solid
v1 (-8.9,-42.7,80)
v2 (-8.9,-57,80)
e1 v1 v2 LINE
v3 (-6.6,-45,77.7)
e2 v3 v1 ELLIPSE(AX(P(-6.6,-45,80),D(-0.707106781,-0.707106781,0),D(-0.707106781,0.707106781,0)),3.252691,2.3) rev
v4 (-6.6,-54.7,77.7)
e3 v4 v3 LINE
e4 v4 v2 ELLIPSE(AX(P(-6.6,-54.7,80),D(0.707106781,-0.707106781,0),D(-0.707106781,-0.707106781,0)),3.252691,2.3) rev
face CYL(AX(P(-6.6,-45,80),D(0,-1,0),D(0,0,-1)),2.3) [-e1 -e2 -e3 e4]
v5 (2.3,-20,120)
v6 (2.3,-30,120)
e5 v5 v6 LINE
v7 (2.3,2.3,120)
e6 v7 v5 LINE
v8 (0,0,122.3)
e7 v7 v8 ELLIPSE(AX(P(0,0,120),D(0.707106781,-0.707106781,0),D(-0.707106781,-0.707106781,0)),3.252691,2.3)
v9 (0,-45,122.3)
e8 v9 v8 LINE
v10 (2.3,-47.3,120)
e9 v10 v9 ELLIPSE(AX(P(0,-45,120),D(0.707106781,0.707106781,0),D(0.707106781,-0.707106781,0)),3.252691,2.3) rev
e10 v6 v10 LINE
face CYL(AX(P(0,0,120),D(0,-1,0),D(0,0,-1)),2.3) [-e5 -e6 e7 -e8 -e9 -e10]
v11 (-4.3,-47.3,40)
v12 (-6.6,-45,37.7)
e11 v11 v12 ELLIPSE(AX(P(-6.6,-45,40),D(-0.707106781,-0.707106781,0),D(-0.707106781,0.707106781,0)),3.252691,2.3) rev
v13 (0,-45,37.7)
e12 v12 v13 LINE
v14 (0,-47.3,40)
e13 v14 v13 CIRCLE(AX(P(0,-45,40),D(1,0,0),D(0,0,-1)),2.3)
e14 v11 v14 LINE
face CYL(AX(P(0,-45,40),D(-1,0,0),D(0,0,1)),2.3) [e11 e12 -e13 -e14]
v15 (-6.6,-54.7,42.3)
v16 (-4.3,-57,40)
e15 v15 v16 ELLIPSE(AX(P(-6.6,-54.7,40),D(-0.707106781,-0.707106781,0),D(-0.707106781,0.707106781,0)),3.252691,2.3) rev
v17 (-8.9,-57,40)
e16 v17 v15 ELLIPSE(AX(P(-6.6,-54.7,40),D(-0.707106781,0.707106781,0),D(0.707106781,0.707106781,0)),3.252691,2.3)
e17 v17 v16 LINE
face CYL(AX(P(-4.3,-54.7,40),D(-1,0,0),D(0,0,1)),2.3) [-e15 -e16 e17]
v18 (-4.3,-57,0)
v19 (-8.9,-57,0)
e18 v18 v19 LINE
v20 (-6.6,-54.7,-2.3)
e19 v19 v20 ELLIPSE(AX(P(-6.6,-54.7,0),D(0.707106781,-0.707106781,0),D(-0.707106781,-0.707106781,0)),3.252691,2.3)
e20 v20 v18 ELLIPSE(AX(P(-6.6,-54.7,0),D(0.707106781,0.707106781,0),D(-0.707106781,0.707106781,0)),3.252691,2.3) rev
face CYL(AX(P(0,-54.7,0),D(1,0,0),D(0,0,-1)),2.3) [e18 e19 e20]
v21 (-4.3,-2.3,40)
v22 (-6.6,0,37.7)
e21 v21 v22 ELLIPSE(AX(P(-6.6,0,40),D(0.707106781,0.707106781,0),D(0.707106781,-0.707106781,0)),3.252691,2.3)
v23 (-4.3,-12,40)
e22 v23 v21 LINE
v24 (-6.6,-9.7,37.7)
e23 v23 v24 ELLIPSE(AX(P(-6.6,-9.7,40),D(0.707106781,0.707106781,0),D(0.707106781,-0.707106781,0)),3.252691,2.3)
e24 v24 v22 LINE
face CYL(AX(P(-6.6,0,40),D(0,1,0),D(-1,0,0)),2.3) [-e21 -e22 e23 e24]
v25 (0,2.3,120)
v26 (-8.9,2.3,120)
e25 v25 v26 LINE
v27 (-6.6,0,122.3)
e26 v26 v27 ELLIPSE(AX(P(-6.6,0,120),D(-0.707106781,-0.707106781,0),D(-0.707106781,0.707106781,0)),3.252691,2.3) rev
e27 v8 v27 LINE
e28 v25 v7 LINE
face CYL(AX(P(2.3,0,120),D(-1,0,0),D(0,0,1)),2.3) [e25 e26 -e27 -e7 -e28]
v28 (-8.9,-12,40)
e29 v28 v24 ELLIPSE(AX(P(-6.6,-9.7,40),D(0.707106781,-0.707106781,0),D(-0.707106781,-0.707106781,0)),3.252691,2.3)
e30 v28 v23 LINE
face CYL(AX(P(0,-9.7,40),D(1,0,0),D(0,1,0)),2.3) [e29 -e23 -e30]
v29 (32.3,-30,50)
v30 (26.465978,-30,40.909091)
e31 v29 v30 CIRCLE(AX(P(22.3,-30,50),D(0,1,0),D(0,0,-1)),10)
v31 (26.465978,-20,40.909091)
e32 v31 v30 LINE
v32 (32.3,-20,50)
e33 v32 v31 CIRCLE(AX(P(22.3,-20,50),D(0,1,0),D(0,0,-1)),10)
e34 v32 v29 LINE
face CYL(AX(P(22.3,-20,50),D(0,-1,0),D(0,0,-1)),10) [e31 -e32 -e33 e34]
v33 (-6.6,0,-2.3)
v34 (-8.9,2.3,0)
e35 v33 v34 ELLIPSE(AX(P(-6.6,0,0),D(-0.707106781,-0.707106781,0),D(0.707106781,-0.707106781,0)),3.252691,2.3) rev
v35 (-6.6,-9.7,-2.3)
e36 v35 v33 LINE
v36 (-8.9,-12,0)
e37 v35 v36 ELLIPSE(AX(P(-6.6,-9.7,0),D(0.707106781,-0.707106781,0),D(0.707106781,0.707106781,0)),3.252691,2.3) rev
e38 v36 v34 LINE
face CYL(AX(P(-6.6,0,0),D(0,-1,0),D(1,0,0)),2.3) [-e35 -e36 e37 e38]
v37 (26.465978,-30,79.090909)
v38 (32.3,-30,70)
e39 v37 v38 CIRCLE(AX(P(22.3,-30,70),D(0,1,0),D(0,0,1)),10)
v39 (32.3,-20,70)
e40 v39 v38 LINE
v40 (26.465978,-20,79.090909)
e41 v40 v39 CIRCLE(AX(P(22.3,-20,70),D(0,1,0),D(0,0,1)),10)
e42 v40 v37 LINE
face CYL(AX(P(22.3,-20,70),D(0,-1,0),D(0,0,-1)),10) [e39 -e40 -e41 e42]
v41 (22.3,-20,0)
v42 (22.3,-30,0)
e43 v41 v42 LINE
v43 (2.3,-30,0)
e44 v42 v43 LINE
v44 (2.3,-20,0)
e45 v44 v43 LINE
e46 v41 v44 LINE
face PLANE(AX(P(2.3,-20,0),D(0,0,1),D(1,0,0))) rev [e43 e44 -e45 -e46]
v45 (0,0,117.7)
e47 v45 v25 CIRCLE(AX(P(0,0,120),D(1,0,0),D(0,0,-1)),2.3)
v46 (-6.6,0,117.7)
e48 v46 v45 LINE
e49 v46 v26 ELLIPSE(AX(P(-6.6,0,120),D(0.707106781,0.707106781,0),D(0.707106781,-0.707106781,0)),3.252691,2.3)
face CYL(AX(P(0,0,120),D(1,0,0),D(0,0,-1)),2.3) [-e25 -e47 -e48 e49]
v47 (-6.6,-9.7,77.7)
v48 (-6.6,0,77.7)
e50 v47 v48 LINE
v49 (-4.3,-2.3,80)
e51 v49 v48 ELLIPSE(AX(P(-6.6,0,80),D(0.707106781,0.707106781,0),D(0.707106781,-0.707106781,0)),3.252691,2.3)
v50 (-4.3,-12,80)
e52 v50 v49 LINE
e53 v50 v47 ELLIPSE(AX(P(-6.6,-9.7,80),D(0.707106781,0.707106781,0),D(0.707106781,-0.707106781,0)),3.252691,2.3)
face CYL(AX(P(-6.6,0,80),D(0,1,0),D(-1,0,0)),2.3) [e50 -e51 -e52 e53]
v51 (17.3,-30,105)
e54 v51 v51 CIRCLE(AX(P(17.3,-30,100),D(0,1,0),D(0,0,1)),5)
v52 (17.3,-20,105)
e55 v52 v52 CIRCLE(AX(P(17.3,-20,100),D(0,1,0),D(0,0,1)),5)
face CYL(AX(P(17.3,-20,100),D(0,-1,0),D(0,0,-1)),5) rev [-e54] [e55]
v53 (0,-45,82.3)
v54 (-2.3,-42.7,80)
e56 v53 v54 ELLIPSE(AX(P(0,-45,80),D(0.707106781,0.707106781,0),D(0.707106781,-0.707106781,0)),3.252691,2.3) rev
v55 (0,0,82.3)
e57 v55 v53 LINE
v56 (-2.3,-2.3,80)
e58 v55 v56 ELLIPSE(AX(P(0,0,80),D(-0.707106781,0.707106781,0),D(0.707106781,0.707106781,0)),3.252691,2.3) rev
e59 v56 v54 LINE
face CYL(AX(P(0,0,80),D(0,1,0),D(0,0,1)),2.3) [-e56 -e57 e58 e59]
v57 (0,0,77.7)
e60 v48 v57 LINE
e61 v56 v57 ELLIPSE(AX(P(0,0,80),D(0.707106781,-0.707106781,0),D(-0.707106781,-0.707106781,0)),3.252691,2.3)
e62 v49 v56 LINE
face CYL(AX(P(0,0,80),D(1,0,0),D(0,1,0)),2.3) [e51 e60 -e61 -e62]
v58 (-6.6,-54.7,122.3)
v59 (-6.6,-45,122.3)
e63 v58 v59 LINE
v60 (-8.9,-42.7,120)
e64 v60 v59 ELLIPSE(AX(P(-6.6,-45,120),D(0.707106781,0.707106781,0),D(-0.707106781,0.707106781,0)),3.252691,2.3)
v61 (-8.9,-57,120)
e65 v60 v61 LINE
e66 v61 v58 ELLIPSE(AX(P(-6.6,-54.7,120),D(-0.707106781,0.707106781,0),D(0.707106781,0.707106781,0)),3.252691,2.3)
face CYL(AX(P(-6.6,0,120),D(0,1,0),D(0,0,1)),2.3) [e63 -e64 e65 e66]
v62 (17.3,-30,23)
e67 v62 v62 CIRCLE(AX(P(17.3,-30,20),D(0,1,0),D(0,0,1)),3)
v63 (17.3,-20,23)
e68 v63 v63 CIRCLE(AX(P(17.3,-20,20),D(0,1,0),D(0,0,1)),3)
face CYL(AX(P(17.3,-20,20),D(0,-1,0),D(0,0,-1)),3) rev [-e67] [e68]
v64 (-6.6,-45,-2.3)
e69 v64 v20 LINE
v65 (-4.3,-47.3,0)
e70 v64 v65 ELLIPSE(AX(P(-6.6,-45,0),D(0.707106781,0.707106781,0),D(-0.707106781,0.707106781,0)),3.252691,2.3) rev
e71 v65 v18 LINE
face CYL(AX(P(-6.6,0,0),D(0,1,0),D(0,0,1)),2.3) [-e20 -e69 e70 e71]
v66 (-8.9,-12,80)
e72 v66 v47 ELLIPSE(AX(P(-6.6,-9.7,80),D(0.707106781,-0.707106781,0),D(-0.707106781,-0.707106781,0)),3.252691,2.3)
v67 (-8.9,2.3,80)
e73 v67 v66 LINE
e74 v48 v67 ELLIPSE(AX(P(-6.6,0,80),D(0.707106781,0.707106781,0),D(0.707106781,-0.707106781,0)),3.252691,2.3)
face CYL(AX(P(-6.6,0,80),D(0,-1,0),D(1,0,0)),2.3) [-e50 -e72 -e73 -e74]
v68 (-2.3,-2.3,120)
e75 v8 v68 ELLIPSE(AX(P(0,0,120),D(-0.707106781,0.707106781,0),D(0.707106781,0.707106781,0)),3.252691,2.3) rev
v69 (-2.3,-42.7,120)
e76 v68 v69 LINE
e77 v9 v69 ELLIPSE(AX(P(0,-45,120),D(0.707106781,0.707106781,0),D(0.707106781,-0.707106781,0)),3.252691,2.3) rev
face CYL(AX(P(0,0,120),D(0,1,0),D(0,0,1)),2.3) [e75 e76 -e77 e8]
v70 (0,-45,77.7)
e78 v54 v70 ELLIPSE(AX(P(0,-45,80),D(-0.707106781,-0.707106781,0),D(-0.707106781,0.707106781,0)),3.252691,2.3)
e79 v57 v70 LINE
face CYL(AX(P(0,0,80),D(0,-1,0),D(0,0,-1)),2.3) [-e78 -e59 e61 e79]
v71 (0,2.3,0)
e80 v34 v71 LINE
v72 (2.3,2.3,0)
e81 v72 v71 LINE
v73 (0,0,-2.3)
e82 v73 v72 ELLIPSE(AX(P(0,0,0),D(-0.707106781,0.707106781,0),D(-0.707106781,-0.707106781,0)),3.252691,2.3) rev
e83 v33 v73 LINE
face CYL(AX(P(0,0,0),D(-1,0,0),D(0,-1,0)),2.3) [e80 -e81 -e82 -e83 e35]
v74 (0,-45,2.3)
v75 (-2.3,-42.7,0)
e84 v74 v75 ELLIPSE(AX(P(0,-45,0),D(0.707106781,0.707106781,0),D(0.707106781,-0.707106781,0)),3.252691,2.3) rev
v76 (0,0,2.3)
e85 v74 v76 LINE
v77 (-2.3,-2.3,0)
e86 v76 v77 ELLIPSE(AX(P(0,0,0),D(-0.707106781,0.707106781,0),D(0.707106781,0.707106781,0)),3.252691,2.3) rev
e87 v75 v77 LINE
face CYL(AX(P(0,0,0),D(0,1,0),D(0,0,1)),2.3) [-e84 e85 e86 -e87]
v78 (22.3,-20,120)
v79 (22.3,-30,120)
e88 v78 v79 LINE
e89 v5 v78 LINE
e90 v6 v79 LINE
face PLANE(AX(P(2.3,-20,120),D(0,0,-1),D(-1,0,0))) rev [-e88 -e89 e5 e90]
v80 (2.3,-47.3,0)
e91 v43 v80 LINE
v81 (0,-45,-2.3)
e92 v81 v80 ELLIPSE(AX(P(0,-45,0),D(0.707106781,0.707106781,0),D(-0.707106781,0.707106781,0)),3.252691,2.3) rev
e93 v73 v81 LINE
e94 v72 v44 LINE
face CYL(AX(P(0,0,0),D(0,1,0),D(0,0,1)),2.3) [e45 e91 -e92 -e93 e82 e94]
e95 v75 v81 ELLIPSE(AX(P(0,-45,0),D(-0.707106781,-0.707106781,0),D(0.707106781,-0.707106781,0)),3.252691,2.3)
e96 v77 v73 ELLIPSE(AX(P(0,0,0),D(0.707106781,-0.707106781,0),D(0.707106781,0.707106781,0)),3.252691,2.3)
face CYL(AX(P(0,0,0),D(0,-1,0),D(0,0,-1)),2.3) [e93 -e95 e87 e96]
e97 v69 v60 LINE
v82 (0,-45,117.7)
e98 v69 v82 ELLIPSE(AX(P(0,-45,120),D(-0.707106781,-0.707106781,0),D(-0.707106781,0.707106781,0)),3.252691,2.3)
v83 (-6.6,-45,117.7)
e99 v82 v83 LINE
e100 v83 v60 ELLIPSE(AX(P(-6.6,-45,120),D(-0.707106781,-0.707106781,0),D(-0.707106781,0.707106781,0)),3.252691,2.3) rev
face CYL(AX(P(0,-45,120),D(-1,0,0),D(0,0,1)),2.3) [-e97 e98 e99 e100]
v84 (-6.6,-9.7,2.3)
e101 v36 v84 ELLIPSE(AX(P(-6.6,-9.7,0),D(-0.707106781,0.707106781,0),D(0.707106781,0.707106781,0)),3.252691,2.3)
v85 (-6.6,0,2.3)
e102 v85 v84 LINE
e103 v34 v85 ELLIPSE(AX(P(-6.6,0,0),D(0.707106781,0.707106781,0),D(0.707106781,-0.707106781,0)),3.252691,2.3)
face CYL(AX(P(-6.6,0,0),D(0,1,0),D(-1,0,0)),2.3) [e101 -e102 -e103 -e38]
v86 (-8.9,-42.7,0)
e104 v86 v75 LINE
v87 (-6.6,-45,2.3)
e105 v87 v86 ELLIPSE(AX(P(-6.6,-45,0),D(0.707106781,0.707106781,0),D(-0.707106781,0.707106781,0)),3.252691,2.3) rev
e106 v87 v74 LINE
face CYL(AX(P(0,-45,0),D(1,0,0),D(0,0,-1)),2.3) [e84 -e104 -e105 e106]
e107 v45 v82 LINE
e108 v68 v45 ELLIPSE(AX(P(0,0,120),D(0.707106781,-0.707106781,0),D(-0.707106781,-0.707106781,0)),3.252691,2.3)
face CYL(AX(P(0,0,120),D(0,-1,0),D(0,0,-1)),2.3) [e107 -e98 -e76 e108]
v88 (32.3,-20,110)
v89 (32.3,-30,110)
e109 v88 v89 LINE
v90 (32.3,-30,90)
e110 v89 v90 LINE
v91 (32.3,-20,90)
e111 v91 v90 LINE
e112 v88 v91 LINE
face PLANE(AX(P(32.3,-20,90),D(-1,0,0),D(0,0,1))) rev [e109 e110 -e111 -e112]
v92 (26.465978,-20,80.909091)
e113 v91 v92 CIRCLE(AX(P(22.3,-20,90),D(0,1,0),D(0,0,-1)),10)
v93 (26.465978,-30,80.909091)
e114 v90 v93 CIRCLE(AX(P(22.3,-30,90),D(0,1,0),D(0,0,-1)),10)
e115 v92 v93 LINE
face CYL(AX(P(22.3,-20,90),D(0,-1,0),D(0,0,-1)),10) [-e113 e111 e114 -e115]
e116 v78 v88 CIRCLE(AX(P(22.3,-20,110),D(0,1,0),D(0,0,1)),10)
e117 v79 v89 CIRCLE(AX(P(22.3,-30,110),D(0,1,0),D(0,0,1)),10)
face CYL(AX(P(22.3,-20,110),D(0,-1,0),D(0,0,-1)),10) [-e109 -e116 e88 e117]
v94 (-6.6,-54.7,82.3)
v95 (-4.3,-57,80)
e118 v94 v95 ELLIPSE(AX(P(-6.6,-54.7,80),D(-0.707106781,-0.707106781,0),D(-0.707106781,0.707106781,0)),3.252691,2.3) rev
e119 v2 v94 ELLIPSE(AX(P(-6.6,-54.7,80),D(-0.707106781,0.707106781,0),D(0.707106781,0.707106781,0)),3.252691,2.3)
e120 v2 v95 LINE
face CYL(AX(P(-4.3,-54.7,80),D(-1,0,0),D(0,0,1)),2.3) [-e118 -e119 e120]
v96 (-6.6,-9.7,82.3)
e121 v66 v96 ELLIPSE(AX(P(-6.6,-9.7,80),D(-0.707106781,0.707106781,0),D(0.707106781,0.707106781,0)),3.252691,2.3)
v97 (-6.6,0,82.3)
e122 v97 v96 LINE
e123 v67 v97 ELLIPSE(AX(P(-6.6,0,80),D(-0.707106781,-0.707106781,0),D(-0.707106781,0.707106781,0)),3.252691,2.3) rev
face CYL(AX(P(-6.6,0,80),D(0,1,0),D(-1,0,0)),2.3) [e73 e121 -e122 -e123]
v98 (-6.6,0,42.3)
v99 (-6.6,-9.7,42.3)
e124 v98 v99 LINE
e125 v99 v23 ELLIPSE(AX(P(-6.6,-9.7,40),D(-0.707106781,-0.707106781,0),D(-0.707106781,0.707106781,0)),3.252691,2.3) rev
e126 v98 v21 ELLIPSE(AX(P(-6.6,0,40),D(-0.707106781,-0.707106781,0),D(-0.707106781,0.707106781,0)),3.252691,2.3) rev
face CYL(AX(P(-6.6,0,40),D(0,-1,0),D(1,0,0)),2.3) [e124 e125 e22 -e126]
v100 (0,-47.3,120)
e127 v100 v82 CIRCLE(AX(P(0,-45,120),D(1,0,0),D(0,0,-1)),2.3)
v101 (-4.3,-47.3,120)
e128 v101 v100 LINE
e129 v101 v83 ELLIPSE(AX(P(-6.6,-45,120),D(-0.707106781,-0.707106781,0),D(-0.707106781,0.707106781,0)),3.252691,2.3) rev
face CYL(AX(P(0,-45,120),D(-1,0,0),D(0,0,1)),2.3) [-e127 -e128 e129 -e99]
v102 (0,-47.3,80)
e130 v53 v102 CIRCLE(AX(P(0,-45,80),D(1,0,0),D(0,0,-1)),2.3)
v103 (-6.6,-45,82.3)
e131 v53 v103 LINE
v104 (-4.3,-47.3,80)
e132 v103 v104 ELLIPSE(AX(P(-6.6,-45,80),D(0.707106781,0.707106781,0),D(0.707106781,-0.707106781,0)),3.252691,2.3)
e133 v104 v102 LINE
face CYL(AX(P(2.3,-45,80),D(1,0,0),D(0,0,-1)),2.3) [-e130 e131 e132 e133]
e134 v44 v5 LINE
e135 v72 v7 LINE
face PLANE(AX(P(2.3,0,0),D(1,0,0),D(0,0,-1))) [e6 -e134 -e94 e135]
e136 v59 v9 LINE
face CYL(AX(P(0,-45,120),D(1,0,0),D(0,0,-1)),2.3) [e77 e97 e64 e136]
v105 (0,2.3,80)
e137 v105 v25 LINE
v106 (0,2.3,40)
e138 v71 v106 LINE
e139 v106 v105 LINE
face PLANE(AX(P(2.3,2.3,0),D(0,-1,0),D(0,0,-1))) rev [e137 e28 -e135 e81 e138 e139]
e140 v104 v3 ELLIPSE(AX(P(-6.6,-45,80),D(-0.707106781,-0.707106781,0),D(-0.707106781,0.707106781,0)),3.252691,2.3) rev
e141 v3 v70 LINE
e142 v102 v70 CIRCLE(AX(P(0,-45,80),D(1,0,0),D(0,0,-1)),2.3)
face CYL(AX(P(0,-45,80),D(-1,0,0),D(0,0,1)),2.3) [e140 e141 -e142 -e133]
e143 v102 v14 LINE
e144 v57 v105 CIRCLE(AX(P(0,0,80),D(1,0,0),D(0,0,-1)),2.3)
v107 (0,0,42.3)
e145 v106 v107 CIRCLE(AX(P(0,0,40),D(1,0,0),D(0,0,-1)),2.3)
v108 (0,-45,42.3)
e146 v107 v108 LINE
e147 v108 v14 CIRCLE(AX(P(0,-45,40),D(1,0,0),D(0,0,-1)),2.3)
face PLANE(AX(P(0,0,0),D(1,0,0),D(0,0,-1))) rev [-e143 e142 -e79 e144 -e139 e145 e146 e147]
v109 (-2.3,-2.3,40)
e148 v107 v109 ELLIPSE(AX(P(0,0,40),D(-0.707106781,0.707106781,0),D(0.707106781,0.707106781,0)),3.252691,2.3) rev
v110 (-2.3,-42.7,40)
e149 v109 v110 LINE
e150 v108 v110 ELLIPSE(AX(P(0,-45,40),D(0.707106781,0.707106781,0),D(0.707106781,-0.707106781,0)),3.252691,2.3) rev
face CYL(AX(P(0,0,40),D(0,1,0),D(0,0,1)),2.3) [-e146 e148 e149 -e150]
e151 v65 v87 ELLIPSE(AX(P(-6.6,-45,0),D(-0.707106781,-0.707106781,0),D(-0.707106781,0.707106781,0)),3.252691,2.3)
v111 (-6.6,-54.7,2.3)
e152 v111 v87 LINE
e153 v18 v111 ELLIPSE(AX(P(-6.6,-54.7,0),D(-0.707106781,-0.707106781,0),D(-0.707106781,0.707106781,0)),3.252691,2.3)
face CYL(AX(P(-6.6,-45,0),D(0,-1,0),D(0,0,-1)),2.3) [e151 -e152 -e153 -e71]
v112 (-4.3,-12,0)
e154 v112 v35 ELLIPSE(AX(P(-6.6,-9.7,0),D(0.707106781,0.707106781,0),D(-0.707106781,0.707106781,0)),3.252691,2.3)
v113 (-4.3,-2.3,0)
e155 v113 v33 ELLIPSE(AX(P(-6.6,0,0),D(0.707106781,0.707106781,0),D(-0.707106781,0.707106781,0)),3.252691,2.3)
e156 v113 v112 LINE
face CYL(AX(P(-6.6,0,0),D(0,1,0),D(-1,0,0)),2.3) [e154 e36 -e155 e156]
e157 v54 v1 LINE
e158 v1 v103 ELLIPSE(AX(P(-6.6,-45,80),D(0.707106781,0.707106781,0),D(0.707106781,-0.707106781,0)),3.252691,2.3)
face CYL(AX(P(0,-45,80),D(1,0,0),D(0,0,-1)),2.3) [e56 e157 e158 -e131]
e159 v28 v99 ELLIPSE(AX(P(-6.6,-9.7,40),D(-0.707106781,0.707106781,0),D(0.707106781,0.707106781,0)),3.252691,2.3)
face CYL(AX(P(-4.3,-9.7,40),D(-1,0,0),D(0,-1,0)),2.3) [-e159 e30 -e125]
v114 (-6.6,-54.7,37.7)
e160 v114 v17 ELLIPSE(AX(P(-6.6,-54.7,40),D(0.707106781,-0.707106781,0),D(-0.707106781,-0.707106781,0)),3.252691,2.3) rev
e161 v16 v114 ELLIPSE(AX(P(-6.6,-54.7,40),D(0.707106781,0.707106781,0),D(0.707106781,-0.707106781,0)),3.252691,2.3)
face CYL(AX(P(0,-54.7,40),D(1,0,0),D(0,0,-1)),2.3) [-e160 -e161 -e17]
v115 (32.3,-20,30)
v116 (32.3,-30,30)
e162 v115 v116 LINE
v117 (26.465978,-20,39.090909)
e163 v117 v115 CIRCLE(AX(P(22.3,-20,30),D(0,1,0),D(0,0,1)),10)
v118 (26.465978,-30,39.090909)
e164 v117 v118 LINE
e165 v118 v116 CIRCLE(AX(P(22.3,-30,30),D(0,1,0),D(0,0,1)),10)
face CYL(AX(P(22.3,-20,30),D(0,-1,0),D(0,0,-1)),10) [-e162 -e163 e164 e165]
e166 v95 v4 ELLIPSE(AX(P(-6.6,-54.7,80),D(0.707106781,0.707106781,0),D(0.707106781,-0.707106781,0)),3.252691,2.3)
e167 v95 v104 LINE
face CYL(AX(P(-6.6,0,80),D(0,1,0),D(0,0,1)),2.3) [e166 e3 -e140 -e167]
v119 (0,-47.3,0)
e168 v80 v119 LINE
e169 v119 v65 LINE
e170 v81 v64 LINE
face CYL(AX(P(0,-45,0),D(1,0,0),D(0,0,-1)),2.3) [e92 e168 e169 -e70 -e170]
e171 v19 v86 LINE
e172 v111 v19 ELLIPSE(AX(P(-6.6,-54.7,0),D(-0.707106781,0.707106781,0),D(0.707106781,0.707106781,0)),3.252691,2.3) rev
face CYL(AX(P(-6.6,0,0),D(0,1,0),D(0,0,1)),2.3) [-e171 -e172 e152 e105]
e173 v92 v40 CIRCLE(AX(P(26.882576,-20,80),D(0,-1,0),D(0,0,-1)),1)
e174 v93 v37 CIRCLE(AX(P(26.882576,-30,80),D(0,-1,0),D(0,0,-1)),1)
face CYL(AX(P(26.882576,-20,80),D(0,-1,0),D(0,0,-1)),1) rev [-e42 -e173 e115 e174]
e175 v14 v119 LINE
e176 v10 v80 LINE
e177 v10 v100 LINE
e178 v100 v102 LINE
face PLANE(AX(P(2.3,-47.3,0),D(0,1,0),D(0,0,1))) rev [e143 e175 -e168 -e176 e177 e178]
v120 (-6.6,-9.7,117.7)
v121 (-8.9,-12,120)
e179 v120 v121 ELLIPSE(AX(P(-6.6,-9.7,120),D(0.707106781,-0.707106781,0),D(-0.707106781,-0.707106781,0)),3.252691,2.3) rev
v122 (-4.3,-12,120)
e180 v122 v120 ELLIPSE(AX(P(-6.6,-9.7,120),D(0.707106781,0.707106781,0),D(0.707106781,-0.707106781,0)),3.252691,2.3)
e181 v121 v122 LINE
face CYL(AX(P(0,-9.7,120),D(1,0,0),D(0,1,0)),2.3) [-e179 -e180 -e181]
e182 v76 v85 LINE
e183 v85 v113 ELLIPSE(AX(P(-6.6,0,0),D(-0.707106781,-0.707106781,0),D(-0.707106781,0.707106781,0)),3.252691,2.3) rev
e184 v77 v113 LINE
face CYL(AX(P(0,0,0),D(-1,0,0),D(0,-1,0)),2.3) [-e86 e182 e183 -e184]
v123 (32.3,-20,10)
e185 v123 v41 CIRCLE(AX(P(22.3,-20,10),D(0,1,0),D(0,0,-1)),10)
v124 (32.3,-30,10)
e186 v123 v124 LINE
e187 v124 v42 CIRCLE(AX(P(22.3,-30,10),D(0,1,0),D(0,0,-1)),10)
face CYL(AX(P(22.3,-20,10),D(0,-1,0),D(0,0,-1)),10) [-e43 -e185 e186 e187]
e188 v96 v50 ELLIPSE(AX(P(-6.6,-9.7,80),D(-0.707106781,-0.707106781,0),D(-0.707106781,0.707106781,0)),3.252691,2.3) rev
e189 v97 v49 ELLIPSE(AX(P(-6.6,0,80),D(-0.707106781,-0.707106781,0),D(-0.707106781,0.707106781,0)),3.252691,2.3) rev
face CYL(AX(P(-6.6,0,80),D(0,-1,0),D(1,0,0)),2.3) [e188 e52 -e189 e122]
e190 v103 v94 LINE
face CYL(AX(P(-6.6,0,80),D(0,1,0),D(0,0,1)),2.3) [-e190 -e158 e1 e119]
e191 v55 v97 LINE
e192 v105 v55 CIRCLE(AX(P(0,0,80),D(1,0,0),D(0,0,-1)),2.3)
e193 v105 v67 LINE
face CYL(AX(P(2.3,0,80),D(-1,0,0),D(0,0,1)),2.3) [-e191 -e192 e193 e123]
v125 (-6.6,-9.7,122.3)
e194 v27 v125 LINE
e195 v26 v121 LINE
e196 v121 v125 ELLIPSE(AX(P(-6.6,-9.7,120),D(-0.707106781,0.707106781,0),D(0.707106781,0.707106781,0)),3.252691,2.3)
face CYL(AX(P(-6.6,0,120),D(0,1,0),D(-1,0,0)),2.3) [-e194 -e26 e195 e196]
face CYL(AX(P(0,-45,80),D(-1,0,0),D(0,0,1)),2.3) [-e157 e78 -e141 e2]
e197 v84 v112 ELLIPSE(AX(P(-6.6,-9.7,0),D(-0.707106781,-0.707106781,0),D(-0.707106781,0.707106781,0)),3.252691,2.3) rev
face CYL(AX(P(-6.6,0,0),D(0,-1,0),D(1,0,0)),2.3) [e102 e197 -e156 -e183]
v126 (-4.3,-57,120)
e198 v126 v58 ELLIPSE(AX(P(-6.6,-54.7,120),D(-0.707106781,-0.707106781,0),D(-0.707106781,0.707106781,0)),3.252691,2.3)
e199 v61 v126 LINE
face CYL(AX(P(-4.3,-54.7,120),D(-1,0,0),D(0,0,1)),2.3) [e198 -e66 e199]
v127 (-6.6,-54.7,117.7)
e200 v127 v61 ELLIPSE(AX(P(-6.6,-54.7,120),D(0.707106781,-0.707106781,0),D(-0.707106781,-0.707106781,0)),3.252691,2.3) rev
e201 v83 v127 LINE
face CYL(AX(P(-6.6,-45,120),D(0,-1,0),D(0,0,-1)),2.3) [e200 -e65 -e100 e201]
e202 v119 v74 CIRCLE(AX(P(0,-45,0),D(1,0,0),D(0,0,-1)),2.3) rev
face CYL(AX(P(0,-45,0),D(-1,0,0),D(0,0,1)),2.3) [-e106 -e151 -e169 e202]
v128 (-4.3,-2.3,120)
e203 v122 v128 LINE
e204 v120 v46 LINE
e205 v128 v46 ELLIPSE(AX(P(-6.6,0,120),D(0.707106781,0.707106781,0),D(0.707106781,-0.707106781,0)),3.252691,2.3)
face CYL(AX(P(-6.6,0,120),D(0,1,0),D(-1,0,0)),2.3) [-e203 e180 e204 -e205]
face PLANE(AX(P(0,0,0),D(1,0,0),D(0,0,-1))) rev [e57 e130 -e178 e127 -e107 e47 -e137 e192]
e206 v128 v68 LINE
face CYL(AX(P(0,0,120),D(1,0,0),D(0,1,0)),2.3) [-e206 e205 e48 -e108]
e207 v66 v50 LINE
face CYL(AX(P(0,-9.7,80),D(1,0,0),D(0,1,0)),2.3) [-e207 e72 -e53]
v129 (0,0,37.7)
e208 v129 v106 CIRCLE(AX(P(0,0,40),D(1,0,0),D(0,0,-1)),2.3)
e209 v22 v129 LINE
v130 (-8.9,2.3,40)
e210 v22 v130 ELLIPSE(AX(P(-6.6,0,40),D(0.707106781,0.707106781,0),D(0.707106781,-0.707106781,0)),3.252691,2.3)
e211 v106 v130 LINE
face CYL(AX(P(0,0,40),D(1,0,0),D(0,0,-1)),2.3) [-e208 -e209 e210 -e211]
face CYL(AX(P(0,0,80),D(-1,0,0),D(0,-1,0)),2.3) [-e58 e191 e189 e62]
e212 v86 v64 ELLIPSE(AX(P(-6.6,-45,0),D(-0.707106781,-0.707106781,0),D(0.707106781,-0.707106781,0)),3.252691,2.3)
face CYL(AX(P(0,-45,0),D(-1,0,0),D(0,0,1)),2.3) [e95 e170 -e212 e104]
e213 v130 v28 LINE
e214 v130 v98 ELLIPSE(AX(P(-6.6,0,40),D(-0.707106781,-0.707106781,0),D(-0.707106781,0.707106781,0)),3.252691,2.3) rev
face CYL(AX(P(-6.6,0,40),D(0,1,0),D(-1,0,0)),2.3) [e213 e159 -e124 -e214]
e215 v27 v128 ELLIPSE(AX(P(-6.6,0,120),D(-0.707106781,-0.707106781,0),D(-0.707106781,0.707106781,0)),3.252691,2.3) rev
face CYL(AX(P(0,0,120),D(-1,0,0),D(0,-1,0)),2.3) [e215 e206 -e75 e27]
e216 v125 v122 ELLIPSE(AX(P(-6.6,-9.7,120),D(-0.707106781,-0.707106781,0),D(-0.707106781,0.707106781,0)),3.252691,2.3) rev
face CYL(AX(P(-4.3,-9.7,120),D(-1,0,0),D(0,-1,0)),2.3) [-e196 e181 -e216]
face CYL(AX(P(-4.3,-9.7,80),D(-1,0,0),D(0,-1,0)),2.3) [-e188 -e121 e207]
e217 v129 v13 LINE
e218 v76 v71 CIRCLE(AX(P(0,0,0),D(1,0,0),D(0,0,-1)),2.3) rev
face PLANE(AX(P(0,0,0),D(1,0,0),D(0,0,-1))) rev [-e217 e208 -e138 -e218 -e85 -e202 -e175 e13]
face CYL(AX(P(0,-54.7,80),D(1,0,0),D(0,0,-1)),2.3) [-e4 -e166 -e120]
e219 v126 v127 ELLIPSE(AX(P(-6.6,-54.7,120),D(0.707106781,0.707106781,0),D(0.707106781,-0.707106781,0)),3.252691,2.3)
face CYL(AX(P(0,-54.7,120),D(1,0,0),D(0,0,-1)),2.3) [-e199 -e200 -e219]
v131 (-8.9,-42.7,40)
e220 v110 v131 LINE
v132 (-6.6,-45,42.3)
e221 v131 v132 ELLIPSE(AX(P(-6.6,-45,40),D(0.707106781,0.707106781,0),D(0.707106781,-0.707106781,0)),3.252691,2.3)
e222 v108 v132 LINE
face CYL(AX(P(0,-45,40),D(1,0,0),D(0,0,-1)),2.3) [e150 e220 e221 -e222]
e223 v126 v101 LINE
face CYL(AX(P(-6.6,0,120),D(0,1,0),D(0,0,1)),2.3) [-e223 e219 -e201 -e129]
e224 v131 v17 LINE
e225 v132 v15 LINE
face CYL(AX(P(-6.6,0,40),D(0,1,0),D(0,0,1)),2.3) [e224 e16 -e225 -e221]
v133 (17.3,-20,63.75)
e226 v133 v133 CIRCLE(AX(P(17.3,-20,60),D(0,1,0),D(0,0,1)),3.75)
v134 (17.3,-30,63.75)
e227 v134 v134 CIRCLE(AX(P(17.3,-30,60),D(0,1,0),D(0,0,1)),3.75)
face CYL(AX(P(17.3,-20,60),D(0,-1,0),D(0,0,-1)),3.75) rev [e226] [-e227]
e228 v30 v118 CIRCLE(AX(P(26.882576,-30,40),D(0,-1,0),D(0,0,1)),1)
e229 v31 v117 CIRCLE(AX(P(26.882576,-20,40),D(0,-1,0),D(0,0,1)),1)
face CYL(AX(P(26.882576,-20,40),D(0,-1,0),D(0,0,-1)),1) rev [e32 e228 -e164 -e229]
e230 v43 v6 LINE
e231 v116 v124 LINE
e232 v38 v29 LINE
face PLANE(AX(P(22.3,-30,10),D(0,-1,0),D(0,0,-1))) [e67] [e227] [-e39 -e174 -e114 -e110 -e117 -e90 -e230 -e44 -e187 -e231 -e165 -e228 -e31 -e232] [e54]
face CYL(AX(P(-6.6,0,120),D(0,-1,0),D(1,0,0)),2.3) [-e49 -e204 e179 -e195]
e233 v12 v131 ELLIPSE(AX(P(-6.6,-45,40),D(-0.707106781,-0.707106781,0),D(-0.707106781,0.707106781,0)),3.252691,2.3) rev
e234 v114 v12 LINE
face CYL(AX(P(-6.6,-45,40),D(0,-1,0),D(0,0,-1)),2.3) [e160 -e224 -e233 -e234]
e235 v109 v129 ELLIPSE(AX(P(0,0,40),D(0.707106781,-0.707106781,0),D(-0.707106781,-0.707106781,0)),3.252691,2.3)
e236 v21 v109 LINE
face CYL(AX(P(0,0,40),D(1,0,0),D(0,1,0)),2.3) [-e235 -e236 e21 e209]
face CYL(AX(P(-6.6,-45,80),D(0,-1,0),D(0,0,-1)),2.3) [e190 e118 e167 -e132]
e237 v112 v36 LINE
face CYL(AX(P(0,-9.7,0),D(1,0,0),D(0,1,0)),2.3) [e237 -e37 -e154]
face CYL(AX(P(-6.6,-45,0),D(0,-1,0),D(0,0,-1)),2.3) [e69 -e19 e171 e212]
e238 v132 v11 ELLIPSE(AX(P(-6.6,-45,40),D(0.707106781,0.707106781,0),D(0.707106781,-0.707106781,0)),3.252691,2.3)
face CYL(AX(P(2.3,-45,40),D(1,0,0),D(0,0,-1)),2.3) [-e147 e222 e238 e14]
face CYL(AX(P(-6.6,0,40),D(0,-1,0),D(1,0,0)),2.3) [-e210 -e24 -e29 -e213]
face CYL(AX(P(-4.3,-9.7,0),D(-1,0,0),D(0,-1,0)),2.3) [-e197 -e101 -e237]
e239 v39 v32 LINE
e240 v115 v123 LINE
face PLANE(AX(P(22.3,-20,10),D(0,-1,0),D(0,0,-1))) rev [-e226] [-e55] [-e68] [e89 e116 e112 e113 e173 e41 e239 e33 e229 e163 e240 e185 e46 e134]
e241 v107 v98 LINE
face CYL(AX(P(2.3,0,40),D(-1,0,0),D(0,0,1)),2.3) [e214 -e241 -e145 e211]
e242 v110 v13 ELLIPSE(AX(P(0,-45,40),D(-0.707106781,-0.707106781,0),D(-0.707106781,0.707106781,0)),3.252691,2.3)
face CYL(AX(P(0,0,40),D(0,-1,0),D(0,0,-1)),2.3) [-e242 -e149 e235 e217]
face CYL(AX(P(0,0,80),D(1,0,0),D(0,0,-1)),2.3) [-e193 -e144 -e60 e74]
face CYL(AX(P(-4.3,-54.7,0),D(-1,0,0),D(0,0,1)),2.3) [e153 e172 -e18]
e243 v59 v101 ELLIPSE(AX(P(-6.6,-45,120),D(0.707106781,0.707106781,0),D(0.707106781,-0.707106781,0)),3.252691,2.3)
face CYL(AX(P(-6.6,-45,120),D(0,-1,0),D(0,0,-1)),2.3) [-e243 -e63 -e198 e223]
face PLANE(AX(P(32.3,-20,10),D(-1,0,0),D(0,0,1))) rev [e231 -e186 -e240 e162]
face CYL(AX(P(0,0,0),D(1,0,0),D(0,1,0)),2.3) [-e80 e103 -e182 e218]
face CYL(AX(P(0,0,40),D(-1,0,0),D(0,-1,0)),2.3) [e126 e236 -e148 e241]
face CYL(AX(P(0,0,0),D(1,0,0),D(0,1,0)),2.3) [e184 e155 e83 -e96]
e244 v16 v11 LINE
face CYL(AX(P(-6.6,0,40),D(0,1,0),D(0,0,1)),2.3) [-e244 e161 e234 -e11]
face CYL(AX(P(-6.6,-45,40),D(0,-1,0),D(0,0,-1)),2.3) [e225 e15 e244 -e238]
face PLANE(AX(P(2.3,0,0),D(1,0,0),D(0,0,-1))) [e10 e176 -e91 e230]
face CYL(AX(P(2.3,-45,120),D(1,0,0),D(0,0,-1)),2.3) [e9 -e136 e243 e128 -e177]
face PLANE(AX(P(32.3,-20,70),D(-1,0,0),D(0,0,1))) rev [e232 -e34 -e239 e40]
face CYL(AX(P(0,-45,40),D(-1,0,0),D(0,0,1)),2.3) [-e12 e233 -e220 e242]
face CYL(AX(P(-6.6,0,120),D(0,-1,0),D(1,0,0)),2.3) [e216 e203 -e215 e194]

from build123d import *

# Parameters (mm, degrees)
EXTRU_MINCE1_DEPTH           = 2.3
CONG_1_R                     = 2.3
ESQUISSE2_W                  = 120
ESQUISSE2_H                  = 49.6
BOSS_EXTRU_1_DEPTH           = 2.3
R_P_TITION_START             = 117.7
R_P_TITION_LIN_AIRE1_DEPTH   = 4.6
R_P_TITION_START_2           = 37.7
R_P_TITION_LIN_AIRE1_2_DEPTH = 4.6
R_P_TITION_START_3           = 77.7
R_P_TITION_LIN_AIRE1_3_DEPTH = 4.6
CONG_2_R                     = 2.3
BOSS_EXTRU_2_START           = -30
BOSS_EXTRU_2_OUTLINE_R       = 5
BOSS_EXTRU_2_OUTLINE_R_2     = 3.75
BOSS_EXTRU_2_OUTLINE_R_3     = 3
BOSS_EXTRU_2_DEPTH           = 10


# Read off the part's stored shape, not the designer's step: Répétition linéaire1, Boss.-Extru.2
with BuildPart() as part:
    # Esquisse1 → Extru.-Mince1 (new, symmetric)
    with BuildSketch(Plane.XY):
        Polygon((-4.3, -57), (-4.3, -47.3), (2.3, -47.3), (2.3, 2.3), (-8.9, 2.3), (-8.9, -12), (-4.3, -12), (-4.3, -2.3), (-2.3, -2.3), (-2.3, -42.7), (-8.9, -42.7), (-8.9, -57), align=None)
    extrude(amount=EXTRU_MINCE1_DEPTH, both=True)

    # Congé1
    cong_1_edges = [part.edges().sort_by_distance(p)[0] for p in [
        (-6.6, -57, -2.3),
        (-4.3, -52.15, -2.3),
        (-1, -47.3, -2.3),
        (2.3, -22.5, -2.3),
        (-3.3, 2.3, -2.3),
        (-8.9, -4.85, -2.3),
        (-6.6, -12, -2.3),
        (-4.3, -7.15, -2.3),
        (-3.3, -2.3, -2.3),
        (-2.3, -22.5, -2.3),
        (-5.6, -42.7, -2.3),
        (-8.9, -49.85, -2.3),
        (-5.6, -42.7, 2.3),
        (-2.3, -22.5, 2.3),
        (-3.3, -2.3, 2.3),
        (-4.3, -7.15, 2.3),
        (-6.6, -12, 2.3),
        (-8.9, -4.85, 2.3),
        (-3.3, 2.3, 2.3),
        (2.3, -22.5, 2.3),
        (-1, -47.3, 2.3),
        (-4.3, -52.15, 2.3),
        (-6.6, -57, 2.3),
        (-8.9, -49.85, 2.3),
    ]]
    fillet(cong_1_edges, radius=CONG_1_R - 0.0001)  # a hair under: the kernel refuses the full size

    # Esquisse2 → Boss.-Extru.1 (add)
    with BuildSketch(Plane(origin=(0, 0, 0), x_dir=(0, 0, -1), z_dir=(1, 0, 0))):
        with Locations((-60, -22.5)):
            Rectangle(ESQUISSE2_W, ESQUISSE2_H)
    extrude(amount=BOSS_EXTRU_1_DEPTH)

    # Répétition linéaire1 outline → Répétition linéaire1 (add)
    with BuildSketch(Plane.XY.offset(R_P_TITION_START)):
        Polygon((-8.9, 2.3), (-8.9, -12), (-4.3, -12), (-4.3, -2.3), (-2.3, -2.3), (-2.3, -42.7), (-8.9, -42.7), (-8.9, -57), (-4.3, -57), (-4.3, -47.3), (2.3, -47.3), (2.3, 2.3), align=None)
    extrude(amount=R_P_TITION_LIN_AIRE1_DEPTH)

    # R_p_tition lin_aire1 2 outline → R_p_tition lin_aire1 2 (add)
    with BuildSketch(Plane.XY.offset(R_P_TITION_START_2)):
        Polygon((0, 2.3), (-8.9, 2.3), (-8.9, -12), (-4.3, -12), (-4.3, -2.3), (-2.3, -2.3), (-2.3, -42.7), (-8.9, -42.7), (-8.9, -57), (-4.3, -57), (-4.3, -47.3), (0, -47.3), align=None)
    extrude(amount=R_P_TITION_LIN_AIRE1_2_DEPTH)

    # R_p_tition lin_aire1 3 outline → R_p_tition lin_aire1 3 (add)
    with BuildSketch(Plane.XY.offset(R_P_TITION_START_3)):
        Polygon((0, 2.3), (-8.9, 2.3), (-8.9, -12), (-4.3, -12), (-4.3, -2.3), (-2.3, -2.3), (-2.3, -42.7), (-8.9, -42.7), (-8.9, -57), (-4.3, -57), (-4.3, -47.3), (0, -47.3), align=None)
    extrude(amount=R_P_TITION_LIN_AIRE1_3_DEPTH)

    # Congé2
    cong_2_edges = [part.edges().sort_by_distance(p)[0] for p in [
        (-2.15, -47.3, 82.3),
        (-4.45, 2.3, 82.3),
        (-4.3, -7.15, 82.3),
        (-3.3, -2.3, 82.3),
        (-2.3, -22.5, 82.3),
        (-5.6, -42.7, 82.3),
        (-8.9, -49.85, 82.3),
        (-4.45, 2.3, 77.7),
        (-2.15, -47.3, 77.7),
        (-4.3, -52.15, 77.7),
        (-6.6, -57, 77.7),
        (-6.6, -12, 77.7),
        (-8.9, -4.85, 77.7),
        (-8.9, -49.85, 77.7),
        (-6.6, -57, 82.3),
        (-4.3, -52.15, 82.3),
        (-8.9, -4.85, 82.3),
        (-6.6, -12, 82.3),
        (-4.3, -7.15, 77.7),
        (-3.3, -2.3, 77.7),
        (-2.3, -22.5, 77.7),
        (-5.6, -42.7, 77.7),
        (2.3, -22.5, 122.3),
        (-1, -47.3, 122.3),
        (-3.3, 2.3, 122.3),
        (-4.45, 2.3, 117.7),
        (-2.15, -47.3, 117.7),
        (-4.3, -52.15, 117.7),
        (-6.6, -57, 117.7),
        (-6.6, -12, 117.7),
        (-8.9, -4.85, 117.7),
        (-8.9, -49.85, 117.7),
        (-6.6, -57, 122.3),
        (-4.3, -52.15, 122.3),
        (-8.9, -4.85, 122.3),
        (-6.6, -12, 122.3),
        (-4.3, -7.15, 117.7),
        (-3.3, -2.3, 117.7),
        (-2.3, -22.5, 117.7),
        (-5.6, -42.7, 117.7),
        (-8.9, -49.85, 122.3),
        (-4.3, -7.15, 122.3),
        (-3.3, -2.3, 122.3),
        (-2.3, -22.5, 122.3),
        (-5.6, -42.7, 122.3),
        (-2.15, -47.3, 42.3),
        (-4.45, 2.3, 42.3),
        (-4.3, -7.15, 42.3),
        (-3.3, -2.3, 42.3),
        (-2.3, -22.5, 42.3),
        (-5.6, -42.7, 42.3),
        (-8.9, -49.85, 42.3),
        (-4.45, 2.3, 37.7),
        (-2.15, -47.3, 37.7),
        (-4.3, -52.15, 37.7),
        (-6.6, -57, 37.7),
        (-6.6, -12, 37.7),
        (-8.9, -4.85, 37.7),
        (-8.9, -49.85, 37.7),
        (-6.6, -57, 42.3),
        (-4.3, -52.15, 42.3),
        (-8.9, -4.85, 42.3),
        (-6.6, -12, 42.3),
        (-4.3, -7.15, 37.7),
        (-3.3, -2.3, 37.7),
        (-2.3, -22.5, 37.7),
        (-5.6, -42.7, 37.7),
    ]]
    fillet(cong_2_edges, radius=CONG_2_R - 0.0001)  # a hair under: the kernel refuses the full size

    # Boss.-Extru.2 outline → Boss.-Extru.2 (add)
    with BuildSketch(Plane(origin=(0, 0, 0), x_dir=(1, 0, 0), z_dir=(0, 1, 0)).offset(BOSS_EXTRU_2_START)):
        with BuildLine():
            Line((2.3, -120), (22.3, -120))
            ThreePointArc((22.3, -120), (29.371067812, -117.071067812), (32.3, -110))
            Line((32.3, -110), (32.3, -90))
            ThreePointArc((32.3, -90), (30.71604952, -84.599063926), (26.465977905, -80.909090909))
            ThreePointArc((26.465977905, -80.909090909), (25.882575695, -80), (26.465977905, -79.090909091))
            ThreePointArc((26.465977905, -79.090909091), (30.71604952, -75.400936074), (32.3, -70))
            Line((32.3, -70), (32.3, -50))
            ThreePointArc((32.3, -50), (30.71604952, -44.599063926), (26.465977905, -40.909090909))
            ThreePointArc((26.465977905, -40.909090909), (25.882575695, -40), (26.465977905, -39.090909091))
            ThreePointArc((26.465977905, -39.090909091), (30.71604952, -35.400936074), (32.3, -30))
            Line((32.3, -30), (32.3, -10))
            ThreePointArc((32.3, -10), (29.371067812, -2.928932188), (22.3, 0))
            Line((22.3, 0), (2.3, 0))
            Line((2.3, 0), (2.3, -120))
        make_face()
        with Locations((17.3, -100)):
            Circle(BOSS_EXTRU_2_OUTLINE_R, mode=Mode.SUBTRACT)
        with Locations((17.3, -60)):
            Circle(BOSS_EXTRU_2_OUTLINE_R_2, mode=Mode.SUBTRACT)
        with Locations((17.3, -20)):
            Circle(BOSS_EXTRU_2_OUTLINE_R_3, mode=Mode.SUBTRACT)
    extrude(amount=BOSS_EXTRU_2_DEPTH)


solid = part.part
